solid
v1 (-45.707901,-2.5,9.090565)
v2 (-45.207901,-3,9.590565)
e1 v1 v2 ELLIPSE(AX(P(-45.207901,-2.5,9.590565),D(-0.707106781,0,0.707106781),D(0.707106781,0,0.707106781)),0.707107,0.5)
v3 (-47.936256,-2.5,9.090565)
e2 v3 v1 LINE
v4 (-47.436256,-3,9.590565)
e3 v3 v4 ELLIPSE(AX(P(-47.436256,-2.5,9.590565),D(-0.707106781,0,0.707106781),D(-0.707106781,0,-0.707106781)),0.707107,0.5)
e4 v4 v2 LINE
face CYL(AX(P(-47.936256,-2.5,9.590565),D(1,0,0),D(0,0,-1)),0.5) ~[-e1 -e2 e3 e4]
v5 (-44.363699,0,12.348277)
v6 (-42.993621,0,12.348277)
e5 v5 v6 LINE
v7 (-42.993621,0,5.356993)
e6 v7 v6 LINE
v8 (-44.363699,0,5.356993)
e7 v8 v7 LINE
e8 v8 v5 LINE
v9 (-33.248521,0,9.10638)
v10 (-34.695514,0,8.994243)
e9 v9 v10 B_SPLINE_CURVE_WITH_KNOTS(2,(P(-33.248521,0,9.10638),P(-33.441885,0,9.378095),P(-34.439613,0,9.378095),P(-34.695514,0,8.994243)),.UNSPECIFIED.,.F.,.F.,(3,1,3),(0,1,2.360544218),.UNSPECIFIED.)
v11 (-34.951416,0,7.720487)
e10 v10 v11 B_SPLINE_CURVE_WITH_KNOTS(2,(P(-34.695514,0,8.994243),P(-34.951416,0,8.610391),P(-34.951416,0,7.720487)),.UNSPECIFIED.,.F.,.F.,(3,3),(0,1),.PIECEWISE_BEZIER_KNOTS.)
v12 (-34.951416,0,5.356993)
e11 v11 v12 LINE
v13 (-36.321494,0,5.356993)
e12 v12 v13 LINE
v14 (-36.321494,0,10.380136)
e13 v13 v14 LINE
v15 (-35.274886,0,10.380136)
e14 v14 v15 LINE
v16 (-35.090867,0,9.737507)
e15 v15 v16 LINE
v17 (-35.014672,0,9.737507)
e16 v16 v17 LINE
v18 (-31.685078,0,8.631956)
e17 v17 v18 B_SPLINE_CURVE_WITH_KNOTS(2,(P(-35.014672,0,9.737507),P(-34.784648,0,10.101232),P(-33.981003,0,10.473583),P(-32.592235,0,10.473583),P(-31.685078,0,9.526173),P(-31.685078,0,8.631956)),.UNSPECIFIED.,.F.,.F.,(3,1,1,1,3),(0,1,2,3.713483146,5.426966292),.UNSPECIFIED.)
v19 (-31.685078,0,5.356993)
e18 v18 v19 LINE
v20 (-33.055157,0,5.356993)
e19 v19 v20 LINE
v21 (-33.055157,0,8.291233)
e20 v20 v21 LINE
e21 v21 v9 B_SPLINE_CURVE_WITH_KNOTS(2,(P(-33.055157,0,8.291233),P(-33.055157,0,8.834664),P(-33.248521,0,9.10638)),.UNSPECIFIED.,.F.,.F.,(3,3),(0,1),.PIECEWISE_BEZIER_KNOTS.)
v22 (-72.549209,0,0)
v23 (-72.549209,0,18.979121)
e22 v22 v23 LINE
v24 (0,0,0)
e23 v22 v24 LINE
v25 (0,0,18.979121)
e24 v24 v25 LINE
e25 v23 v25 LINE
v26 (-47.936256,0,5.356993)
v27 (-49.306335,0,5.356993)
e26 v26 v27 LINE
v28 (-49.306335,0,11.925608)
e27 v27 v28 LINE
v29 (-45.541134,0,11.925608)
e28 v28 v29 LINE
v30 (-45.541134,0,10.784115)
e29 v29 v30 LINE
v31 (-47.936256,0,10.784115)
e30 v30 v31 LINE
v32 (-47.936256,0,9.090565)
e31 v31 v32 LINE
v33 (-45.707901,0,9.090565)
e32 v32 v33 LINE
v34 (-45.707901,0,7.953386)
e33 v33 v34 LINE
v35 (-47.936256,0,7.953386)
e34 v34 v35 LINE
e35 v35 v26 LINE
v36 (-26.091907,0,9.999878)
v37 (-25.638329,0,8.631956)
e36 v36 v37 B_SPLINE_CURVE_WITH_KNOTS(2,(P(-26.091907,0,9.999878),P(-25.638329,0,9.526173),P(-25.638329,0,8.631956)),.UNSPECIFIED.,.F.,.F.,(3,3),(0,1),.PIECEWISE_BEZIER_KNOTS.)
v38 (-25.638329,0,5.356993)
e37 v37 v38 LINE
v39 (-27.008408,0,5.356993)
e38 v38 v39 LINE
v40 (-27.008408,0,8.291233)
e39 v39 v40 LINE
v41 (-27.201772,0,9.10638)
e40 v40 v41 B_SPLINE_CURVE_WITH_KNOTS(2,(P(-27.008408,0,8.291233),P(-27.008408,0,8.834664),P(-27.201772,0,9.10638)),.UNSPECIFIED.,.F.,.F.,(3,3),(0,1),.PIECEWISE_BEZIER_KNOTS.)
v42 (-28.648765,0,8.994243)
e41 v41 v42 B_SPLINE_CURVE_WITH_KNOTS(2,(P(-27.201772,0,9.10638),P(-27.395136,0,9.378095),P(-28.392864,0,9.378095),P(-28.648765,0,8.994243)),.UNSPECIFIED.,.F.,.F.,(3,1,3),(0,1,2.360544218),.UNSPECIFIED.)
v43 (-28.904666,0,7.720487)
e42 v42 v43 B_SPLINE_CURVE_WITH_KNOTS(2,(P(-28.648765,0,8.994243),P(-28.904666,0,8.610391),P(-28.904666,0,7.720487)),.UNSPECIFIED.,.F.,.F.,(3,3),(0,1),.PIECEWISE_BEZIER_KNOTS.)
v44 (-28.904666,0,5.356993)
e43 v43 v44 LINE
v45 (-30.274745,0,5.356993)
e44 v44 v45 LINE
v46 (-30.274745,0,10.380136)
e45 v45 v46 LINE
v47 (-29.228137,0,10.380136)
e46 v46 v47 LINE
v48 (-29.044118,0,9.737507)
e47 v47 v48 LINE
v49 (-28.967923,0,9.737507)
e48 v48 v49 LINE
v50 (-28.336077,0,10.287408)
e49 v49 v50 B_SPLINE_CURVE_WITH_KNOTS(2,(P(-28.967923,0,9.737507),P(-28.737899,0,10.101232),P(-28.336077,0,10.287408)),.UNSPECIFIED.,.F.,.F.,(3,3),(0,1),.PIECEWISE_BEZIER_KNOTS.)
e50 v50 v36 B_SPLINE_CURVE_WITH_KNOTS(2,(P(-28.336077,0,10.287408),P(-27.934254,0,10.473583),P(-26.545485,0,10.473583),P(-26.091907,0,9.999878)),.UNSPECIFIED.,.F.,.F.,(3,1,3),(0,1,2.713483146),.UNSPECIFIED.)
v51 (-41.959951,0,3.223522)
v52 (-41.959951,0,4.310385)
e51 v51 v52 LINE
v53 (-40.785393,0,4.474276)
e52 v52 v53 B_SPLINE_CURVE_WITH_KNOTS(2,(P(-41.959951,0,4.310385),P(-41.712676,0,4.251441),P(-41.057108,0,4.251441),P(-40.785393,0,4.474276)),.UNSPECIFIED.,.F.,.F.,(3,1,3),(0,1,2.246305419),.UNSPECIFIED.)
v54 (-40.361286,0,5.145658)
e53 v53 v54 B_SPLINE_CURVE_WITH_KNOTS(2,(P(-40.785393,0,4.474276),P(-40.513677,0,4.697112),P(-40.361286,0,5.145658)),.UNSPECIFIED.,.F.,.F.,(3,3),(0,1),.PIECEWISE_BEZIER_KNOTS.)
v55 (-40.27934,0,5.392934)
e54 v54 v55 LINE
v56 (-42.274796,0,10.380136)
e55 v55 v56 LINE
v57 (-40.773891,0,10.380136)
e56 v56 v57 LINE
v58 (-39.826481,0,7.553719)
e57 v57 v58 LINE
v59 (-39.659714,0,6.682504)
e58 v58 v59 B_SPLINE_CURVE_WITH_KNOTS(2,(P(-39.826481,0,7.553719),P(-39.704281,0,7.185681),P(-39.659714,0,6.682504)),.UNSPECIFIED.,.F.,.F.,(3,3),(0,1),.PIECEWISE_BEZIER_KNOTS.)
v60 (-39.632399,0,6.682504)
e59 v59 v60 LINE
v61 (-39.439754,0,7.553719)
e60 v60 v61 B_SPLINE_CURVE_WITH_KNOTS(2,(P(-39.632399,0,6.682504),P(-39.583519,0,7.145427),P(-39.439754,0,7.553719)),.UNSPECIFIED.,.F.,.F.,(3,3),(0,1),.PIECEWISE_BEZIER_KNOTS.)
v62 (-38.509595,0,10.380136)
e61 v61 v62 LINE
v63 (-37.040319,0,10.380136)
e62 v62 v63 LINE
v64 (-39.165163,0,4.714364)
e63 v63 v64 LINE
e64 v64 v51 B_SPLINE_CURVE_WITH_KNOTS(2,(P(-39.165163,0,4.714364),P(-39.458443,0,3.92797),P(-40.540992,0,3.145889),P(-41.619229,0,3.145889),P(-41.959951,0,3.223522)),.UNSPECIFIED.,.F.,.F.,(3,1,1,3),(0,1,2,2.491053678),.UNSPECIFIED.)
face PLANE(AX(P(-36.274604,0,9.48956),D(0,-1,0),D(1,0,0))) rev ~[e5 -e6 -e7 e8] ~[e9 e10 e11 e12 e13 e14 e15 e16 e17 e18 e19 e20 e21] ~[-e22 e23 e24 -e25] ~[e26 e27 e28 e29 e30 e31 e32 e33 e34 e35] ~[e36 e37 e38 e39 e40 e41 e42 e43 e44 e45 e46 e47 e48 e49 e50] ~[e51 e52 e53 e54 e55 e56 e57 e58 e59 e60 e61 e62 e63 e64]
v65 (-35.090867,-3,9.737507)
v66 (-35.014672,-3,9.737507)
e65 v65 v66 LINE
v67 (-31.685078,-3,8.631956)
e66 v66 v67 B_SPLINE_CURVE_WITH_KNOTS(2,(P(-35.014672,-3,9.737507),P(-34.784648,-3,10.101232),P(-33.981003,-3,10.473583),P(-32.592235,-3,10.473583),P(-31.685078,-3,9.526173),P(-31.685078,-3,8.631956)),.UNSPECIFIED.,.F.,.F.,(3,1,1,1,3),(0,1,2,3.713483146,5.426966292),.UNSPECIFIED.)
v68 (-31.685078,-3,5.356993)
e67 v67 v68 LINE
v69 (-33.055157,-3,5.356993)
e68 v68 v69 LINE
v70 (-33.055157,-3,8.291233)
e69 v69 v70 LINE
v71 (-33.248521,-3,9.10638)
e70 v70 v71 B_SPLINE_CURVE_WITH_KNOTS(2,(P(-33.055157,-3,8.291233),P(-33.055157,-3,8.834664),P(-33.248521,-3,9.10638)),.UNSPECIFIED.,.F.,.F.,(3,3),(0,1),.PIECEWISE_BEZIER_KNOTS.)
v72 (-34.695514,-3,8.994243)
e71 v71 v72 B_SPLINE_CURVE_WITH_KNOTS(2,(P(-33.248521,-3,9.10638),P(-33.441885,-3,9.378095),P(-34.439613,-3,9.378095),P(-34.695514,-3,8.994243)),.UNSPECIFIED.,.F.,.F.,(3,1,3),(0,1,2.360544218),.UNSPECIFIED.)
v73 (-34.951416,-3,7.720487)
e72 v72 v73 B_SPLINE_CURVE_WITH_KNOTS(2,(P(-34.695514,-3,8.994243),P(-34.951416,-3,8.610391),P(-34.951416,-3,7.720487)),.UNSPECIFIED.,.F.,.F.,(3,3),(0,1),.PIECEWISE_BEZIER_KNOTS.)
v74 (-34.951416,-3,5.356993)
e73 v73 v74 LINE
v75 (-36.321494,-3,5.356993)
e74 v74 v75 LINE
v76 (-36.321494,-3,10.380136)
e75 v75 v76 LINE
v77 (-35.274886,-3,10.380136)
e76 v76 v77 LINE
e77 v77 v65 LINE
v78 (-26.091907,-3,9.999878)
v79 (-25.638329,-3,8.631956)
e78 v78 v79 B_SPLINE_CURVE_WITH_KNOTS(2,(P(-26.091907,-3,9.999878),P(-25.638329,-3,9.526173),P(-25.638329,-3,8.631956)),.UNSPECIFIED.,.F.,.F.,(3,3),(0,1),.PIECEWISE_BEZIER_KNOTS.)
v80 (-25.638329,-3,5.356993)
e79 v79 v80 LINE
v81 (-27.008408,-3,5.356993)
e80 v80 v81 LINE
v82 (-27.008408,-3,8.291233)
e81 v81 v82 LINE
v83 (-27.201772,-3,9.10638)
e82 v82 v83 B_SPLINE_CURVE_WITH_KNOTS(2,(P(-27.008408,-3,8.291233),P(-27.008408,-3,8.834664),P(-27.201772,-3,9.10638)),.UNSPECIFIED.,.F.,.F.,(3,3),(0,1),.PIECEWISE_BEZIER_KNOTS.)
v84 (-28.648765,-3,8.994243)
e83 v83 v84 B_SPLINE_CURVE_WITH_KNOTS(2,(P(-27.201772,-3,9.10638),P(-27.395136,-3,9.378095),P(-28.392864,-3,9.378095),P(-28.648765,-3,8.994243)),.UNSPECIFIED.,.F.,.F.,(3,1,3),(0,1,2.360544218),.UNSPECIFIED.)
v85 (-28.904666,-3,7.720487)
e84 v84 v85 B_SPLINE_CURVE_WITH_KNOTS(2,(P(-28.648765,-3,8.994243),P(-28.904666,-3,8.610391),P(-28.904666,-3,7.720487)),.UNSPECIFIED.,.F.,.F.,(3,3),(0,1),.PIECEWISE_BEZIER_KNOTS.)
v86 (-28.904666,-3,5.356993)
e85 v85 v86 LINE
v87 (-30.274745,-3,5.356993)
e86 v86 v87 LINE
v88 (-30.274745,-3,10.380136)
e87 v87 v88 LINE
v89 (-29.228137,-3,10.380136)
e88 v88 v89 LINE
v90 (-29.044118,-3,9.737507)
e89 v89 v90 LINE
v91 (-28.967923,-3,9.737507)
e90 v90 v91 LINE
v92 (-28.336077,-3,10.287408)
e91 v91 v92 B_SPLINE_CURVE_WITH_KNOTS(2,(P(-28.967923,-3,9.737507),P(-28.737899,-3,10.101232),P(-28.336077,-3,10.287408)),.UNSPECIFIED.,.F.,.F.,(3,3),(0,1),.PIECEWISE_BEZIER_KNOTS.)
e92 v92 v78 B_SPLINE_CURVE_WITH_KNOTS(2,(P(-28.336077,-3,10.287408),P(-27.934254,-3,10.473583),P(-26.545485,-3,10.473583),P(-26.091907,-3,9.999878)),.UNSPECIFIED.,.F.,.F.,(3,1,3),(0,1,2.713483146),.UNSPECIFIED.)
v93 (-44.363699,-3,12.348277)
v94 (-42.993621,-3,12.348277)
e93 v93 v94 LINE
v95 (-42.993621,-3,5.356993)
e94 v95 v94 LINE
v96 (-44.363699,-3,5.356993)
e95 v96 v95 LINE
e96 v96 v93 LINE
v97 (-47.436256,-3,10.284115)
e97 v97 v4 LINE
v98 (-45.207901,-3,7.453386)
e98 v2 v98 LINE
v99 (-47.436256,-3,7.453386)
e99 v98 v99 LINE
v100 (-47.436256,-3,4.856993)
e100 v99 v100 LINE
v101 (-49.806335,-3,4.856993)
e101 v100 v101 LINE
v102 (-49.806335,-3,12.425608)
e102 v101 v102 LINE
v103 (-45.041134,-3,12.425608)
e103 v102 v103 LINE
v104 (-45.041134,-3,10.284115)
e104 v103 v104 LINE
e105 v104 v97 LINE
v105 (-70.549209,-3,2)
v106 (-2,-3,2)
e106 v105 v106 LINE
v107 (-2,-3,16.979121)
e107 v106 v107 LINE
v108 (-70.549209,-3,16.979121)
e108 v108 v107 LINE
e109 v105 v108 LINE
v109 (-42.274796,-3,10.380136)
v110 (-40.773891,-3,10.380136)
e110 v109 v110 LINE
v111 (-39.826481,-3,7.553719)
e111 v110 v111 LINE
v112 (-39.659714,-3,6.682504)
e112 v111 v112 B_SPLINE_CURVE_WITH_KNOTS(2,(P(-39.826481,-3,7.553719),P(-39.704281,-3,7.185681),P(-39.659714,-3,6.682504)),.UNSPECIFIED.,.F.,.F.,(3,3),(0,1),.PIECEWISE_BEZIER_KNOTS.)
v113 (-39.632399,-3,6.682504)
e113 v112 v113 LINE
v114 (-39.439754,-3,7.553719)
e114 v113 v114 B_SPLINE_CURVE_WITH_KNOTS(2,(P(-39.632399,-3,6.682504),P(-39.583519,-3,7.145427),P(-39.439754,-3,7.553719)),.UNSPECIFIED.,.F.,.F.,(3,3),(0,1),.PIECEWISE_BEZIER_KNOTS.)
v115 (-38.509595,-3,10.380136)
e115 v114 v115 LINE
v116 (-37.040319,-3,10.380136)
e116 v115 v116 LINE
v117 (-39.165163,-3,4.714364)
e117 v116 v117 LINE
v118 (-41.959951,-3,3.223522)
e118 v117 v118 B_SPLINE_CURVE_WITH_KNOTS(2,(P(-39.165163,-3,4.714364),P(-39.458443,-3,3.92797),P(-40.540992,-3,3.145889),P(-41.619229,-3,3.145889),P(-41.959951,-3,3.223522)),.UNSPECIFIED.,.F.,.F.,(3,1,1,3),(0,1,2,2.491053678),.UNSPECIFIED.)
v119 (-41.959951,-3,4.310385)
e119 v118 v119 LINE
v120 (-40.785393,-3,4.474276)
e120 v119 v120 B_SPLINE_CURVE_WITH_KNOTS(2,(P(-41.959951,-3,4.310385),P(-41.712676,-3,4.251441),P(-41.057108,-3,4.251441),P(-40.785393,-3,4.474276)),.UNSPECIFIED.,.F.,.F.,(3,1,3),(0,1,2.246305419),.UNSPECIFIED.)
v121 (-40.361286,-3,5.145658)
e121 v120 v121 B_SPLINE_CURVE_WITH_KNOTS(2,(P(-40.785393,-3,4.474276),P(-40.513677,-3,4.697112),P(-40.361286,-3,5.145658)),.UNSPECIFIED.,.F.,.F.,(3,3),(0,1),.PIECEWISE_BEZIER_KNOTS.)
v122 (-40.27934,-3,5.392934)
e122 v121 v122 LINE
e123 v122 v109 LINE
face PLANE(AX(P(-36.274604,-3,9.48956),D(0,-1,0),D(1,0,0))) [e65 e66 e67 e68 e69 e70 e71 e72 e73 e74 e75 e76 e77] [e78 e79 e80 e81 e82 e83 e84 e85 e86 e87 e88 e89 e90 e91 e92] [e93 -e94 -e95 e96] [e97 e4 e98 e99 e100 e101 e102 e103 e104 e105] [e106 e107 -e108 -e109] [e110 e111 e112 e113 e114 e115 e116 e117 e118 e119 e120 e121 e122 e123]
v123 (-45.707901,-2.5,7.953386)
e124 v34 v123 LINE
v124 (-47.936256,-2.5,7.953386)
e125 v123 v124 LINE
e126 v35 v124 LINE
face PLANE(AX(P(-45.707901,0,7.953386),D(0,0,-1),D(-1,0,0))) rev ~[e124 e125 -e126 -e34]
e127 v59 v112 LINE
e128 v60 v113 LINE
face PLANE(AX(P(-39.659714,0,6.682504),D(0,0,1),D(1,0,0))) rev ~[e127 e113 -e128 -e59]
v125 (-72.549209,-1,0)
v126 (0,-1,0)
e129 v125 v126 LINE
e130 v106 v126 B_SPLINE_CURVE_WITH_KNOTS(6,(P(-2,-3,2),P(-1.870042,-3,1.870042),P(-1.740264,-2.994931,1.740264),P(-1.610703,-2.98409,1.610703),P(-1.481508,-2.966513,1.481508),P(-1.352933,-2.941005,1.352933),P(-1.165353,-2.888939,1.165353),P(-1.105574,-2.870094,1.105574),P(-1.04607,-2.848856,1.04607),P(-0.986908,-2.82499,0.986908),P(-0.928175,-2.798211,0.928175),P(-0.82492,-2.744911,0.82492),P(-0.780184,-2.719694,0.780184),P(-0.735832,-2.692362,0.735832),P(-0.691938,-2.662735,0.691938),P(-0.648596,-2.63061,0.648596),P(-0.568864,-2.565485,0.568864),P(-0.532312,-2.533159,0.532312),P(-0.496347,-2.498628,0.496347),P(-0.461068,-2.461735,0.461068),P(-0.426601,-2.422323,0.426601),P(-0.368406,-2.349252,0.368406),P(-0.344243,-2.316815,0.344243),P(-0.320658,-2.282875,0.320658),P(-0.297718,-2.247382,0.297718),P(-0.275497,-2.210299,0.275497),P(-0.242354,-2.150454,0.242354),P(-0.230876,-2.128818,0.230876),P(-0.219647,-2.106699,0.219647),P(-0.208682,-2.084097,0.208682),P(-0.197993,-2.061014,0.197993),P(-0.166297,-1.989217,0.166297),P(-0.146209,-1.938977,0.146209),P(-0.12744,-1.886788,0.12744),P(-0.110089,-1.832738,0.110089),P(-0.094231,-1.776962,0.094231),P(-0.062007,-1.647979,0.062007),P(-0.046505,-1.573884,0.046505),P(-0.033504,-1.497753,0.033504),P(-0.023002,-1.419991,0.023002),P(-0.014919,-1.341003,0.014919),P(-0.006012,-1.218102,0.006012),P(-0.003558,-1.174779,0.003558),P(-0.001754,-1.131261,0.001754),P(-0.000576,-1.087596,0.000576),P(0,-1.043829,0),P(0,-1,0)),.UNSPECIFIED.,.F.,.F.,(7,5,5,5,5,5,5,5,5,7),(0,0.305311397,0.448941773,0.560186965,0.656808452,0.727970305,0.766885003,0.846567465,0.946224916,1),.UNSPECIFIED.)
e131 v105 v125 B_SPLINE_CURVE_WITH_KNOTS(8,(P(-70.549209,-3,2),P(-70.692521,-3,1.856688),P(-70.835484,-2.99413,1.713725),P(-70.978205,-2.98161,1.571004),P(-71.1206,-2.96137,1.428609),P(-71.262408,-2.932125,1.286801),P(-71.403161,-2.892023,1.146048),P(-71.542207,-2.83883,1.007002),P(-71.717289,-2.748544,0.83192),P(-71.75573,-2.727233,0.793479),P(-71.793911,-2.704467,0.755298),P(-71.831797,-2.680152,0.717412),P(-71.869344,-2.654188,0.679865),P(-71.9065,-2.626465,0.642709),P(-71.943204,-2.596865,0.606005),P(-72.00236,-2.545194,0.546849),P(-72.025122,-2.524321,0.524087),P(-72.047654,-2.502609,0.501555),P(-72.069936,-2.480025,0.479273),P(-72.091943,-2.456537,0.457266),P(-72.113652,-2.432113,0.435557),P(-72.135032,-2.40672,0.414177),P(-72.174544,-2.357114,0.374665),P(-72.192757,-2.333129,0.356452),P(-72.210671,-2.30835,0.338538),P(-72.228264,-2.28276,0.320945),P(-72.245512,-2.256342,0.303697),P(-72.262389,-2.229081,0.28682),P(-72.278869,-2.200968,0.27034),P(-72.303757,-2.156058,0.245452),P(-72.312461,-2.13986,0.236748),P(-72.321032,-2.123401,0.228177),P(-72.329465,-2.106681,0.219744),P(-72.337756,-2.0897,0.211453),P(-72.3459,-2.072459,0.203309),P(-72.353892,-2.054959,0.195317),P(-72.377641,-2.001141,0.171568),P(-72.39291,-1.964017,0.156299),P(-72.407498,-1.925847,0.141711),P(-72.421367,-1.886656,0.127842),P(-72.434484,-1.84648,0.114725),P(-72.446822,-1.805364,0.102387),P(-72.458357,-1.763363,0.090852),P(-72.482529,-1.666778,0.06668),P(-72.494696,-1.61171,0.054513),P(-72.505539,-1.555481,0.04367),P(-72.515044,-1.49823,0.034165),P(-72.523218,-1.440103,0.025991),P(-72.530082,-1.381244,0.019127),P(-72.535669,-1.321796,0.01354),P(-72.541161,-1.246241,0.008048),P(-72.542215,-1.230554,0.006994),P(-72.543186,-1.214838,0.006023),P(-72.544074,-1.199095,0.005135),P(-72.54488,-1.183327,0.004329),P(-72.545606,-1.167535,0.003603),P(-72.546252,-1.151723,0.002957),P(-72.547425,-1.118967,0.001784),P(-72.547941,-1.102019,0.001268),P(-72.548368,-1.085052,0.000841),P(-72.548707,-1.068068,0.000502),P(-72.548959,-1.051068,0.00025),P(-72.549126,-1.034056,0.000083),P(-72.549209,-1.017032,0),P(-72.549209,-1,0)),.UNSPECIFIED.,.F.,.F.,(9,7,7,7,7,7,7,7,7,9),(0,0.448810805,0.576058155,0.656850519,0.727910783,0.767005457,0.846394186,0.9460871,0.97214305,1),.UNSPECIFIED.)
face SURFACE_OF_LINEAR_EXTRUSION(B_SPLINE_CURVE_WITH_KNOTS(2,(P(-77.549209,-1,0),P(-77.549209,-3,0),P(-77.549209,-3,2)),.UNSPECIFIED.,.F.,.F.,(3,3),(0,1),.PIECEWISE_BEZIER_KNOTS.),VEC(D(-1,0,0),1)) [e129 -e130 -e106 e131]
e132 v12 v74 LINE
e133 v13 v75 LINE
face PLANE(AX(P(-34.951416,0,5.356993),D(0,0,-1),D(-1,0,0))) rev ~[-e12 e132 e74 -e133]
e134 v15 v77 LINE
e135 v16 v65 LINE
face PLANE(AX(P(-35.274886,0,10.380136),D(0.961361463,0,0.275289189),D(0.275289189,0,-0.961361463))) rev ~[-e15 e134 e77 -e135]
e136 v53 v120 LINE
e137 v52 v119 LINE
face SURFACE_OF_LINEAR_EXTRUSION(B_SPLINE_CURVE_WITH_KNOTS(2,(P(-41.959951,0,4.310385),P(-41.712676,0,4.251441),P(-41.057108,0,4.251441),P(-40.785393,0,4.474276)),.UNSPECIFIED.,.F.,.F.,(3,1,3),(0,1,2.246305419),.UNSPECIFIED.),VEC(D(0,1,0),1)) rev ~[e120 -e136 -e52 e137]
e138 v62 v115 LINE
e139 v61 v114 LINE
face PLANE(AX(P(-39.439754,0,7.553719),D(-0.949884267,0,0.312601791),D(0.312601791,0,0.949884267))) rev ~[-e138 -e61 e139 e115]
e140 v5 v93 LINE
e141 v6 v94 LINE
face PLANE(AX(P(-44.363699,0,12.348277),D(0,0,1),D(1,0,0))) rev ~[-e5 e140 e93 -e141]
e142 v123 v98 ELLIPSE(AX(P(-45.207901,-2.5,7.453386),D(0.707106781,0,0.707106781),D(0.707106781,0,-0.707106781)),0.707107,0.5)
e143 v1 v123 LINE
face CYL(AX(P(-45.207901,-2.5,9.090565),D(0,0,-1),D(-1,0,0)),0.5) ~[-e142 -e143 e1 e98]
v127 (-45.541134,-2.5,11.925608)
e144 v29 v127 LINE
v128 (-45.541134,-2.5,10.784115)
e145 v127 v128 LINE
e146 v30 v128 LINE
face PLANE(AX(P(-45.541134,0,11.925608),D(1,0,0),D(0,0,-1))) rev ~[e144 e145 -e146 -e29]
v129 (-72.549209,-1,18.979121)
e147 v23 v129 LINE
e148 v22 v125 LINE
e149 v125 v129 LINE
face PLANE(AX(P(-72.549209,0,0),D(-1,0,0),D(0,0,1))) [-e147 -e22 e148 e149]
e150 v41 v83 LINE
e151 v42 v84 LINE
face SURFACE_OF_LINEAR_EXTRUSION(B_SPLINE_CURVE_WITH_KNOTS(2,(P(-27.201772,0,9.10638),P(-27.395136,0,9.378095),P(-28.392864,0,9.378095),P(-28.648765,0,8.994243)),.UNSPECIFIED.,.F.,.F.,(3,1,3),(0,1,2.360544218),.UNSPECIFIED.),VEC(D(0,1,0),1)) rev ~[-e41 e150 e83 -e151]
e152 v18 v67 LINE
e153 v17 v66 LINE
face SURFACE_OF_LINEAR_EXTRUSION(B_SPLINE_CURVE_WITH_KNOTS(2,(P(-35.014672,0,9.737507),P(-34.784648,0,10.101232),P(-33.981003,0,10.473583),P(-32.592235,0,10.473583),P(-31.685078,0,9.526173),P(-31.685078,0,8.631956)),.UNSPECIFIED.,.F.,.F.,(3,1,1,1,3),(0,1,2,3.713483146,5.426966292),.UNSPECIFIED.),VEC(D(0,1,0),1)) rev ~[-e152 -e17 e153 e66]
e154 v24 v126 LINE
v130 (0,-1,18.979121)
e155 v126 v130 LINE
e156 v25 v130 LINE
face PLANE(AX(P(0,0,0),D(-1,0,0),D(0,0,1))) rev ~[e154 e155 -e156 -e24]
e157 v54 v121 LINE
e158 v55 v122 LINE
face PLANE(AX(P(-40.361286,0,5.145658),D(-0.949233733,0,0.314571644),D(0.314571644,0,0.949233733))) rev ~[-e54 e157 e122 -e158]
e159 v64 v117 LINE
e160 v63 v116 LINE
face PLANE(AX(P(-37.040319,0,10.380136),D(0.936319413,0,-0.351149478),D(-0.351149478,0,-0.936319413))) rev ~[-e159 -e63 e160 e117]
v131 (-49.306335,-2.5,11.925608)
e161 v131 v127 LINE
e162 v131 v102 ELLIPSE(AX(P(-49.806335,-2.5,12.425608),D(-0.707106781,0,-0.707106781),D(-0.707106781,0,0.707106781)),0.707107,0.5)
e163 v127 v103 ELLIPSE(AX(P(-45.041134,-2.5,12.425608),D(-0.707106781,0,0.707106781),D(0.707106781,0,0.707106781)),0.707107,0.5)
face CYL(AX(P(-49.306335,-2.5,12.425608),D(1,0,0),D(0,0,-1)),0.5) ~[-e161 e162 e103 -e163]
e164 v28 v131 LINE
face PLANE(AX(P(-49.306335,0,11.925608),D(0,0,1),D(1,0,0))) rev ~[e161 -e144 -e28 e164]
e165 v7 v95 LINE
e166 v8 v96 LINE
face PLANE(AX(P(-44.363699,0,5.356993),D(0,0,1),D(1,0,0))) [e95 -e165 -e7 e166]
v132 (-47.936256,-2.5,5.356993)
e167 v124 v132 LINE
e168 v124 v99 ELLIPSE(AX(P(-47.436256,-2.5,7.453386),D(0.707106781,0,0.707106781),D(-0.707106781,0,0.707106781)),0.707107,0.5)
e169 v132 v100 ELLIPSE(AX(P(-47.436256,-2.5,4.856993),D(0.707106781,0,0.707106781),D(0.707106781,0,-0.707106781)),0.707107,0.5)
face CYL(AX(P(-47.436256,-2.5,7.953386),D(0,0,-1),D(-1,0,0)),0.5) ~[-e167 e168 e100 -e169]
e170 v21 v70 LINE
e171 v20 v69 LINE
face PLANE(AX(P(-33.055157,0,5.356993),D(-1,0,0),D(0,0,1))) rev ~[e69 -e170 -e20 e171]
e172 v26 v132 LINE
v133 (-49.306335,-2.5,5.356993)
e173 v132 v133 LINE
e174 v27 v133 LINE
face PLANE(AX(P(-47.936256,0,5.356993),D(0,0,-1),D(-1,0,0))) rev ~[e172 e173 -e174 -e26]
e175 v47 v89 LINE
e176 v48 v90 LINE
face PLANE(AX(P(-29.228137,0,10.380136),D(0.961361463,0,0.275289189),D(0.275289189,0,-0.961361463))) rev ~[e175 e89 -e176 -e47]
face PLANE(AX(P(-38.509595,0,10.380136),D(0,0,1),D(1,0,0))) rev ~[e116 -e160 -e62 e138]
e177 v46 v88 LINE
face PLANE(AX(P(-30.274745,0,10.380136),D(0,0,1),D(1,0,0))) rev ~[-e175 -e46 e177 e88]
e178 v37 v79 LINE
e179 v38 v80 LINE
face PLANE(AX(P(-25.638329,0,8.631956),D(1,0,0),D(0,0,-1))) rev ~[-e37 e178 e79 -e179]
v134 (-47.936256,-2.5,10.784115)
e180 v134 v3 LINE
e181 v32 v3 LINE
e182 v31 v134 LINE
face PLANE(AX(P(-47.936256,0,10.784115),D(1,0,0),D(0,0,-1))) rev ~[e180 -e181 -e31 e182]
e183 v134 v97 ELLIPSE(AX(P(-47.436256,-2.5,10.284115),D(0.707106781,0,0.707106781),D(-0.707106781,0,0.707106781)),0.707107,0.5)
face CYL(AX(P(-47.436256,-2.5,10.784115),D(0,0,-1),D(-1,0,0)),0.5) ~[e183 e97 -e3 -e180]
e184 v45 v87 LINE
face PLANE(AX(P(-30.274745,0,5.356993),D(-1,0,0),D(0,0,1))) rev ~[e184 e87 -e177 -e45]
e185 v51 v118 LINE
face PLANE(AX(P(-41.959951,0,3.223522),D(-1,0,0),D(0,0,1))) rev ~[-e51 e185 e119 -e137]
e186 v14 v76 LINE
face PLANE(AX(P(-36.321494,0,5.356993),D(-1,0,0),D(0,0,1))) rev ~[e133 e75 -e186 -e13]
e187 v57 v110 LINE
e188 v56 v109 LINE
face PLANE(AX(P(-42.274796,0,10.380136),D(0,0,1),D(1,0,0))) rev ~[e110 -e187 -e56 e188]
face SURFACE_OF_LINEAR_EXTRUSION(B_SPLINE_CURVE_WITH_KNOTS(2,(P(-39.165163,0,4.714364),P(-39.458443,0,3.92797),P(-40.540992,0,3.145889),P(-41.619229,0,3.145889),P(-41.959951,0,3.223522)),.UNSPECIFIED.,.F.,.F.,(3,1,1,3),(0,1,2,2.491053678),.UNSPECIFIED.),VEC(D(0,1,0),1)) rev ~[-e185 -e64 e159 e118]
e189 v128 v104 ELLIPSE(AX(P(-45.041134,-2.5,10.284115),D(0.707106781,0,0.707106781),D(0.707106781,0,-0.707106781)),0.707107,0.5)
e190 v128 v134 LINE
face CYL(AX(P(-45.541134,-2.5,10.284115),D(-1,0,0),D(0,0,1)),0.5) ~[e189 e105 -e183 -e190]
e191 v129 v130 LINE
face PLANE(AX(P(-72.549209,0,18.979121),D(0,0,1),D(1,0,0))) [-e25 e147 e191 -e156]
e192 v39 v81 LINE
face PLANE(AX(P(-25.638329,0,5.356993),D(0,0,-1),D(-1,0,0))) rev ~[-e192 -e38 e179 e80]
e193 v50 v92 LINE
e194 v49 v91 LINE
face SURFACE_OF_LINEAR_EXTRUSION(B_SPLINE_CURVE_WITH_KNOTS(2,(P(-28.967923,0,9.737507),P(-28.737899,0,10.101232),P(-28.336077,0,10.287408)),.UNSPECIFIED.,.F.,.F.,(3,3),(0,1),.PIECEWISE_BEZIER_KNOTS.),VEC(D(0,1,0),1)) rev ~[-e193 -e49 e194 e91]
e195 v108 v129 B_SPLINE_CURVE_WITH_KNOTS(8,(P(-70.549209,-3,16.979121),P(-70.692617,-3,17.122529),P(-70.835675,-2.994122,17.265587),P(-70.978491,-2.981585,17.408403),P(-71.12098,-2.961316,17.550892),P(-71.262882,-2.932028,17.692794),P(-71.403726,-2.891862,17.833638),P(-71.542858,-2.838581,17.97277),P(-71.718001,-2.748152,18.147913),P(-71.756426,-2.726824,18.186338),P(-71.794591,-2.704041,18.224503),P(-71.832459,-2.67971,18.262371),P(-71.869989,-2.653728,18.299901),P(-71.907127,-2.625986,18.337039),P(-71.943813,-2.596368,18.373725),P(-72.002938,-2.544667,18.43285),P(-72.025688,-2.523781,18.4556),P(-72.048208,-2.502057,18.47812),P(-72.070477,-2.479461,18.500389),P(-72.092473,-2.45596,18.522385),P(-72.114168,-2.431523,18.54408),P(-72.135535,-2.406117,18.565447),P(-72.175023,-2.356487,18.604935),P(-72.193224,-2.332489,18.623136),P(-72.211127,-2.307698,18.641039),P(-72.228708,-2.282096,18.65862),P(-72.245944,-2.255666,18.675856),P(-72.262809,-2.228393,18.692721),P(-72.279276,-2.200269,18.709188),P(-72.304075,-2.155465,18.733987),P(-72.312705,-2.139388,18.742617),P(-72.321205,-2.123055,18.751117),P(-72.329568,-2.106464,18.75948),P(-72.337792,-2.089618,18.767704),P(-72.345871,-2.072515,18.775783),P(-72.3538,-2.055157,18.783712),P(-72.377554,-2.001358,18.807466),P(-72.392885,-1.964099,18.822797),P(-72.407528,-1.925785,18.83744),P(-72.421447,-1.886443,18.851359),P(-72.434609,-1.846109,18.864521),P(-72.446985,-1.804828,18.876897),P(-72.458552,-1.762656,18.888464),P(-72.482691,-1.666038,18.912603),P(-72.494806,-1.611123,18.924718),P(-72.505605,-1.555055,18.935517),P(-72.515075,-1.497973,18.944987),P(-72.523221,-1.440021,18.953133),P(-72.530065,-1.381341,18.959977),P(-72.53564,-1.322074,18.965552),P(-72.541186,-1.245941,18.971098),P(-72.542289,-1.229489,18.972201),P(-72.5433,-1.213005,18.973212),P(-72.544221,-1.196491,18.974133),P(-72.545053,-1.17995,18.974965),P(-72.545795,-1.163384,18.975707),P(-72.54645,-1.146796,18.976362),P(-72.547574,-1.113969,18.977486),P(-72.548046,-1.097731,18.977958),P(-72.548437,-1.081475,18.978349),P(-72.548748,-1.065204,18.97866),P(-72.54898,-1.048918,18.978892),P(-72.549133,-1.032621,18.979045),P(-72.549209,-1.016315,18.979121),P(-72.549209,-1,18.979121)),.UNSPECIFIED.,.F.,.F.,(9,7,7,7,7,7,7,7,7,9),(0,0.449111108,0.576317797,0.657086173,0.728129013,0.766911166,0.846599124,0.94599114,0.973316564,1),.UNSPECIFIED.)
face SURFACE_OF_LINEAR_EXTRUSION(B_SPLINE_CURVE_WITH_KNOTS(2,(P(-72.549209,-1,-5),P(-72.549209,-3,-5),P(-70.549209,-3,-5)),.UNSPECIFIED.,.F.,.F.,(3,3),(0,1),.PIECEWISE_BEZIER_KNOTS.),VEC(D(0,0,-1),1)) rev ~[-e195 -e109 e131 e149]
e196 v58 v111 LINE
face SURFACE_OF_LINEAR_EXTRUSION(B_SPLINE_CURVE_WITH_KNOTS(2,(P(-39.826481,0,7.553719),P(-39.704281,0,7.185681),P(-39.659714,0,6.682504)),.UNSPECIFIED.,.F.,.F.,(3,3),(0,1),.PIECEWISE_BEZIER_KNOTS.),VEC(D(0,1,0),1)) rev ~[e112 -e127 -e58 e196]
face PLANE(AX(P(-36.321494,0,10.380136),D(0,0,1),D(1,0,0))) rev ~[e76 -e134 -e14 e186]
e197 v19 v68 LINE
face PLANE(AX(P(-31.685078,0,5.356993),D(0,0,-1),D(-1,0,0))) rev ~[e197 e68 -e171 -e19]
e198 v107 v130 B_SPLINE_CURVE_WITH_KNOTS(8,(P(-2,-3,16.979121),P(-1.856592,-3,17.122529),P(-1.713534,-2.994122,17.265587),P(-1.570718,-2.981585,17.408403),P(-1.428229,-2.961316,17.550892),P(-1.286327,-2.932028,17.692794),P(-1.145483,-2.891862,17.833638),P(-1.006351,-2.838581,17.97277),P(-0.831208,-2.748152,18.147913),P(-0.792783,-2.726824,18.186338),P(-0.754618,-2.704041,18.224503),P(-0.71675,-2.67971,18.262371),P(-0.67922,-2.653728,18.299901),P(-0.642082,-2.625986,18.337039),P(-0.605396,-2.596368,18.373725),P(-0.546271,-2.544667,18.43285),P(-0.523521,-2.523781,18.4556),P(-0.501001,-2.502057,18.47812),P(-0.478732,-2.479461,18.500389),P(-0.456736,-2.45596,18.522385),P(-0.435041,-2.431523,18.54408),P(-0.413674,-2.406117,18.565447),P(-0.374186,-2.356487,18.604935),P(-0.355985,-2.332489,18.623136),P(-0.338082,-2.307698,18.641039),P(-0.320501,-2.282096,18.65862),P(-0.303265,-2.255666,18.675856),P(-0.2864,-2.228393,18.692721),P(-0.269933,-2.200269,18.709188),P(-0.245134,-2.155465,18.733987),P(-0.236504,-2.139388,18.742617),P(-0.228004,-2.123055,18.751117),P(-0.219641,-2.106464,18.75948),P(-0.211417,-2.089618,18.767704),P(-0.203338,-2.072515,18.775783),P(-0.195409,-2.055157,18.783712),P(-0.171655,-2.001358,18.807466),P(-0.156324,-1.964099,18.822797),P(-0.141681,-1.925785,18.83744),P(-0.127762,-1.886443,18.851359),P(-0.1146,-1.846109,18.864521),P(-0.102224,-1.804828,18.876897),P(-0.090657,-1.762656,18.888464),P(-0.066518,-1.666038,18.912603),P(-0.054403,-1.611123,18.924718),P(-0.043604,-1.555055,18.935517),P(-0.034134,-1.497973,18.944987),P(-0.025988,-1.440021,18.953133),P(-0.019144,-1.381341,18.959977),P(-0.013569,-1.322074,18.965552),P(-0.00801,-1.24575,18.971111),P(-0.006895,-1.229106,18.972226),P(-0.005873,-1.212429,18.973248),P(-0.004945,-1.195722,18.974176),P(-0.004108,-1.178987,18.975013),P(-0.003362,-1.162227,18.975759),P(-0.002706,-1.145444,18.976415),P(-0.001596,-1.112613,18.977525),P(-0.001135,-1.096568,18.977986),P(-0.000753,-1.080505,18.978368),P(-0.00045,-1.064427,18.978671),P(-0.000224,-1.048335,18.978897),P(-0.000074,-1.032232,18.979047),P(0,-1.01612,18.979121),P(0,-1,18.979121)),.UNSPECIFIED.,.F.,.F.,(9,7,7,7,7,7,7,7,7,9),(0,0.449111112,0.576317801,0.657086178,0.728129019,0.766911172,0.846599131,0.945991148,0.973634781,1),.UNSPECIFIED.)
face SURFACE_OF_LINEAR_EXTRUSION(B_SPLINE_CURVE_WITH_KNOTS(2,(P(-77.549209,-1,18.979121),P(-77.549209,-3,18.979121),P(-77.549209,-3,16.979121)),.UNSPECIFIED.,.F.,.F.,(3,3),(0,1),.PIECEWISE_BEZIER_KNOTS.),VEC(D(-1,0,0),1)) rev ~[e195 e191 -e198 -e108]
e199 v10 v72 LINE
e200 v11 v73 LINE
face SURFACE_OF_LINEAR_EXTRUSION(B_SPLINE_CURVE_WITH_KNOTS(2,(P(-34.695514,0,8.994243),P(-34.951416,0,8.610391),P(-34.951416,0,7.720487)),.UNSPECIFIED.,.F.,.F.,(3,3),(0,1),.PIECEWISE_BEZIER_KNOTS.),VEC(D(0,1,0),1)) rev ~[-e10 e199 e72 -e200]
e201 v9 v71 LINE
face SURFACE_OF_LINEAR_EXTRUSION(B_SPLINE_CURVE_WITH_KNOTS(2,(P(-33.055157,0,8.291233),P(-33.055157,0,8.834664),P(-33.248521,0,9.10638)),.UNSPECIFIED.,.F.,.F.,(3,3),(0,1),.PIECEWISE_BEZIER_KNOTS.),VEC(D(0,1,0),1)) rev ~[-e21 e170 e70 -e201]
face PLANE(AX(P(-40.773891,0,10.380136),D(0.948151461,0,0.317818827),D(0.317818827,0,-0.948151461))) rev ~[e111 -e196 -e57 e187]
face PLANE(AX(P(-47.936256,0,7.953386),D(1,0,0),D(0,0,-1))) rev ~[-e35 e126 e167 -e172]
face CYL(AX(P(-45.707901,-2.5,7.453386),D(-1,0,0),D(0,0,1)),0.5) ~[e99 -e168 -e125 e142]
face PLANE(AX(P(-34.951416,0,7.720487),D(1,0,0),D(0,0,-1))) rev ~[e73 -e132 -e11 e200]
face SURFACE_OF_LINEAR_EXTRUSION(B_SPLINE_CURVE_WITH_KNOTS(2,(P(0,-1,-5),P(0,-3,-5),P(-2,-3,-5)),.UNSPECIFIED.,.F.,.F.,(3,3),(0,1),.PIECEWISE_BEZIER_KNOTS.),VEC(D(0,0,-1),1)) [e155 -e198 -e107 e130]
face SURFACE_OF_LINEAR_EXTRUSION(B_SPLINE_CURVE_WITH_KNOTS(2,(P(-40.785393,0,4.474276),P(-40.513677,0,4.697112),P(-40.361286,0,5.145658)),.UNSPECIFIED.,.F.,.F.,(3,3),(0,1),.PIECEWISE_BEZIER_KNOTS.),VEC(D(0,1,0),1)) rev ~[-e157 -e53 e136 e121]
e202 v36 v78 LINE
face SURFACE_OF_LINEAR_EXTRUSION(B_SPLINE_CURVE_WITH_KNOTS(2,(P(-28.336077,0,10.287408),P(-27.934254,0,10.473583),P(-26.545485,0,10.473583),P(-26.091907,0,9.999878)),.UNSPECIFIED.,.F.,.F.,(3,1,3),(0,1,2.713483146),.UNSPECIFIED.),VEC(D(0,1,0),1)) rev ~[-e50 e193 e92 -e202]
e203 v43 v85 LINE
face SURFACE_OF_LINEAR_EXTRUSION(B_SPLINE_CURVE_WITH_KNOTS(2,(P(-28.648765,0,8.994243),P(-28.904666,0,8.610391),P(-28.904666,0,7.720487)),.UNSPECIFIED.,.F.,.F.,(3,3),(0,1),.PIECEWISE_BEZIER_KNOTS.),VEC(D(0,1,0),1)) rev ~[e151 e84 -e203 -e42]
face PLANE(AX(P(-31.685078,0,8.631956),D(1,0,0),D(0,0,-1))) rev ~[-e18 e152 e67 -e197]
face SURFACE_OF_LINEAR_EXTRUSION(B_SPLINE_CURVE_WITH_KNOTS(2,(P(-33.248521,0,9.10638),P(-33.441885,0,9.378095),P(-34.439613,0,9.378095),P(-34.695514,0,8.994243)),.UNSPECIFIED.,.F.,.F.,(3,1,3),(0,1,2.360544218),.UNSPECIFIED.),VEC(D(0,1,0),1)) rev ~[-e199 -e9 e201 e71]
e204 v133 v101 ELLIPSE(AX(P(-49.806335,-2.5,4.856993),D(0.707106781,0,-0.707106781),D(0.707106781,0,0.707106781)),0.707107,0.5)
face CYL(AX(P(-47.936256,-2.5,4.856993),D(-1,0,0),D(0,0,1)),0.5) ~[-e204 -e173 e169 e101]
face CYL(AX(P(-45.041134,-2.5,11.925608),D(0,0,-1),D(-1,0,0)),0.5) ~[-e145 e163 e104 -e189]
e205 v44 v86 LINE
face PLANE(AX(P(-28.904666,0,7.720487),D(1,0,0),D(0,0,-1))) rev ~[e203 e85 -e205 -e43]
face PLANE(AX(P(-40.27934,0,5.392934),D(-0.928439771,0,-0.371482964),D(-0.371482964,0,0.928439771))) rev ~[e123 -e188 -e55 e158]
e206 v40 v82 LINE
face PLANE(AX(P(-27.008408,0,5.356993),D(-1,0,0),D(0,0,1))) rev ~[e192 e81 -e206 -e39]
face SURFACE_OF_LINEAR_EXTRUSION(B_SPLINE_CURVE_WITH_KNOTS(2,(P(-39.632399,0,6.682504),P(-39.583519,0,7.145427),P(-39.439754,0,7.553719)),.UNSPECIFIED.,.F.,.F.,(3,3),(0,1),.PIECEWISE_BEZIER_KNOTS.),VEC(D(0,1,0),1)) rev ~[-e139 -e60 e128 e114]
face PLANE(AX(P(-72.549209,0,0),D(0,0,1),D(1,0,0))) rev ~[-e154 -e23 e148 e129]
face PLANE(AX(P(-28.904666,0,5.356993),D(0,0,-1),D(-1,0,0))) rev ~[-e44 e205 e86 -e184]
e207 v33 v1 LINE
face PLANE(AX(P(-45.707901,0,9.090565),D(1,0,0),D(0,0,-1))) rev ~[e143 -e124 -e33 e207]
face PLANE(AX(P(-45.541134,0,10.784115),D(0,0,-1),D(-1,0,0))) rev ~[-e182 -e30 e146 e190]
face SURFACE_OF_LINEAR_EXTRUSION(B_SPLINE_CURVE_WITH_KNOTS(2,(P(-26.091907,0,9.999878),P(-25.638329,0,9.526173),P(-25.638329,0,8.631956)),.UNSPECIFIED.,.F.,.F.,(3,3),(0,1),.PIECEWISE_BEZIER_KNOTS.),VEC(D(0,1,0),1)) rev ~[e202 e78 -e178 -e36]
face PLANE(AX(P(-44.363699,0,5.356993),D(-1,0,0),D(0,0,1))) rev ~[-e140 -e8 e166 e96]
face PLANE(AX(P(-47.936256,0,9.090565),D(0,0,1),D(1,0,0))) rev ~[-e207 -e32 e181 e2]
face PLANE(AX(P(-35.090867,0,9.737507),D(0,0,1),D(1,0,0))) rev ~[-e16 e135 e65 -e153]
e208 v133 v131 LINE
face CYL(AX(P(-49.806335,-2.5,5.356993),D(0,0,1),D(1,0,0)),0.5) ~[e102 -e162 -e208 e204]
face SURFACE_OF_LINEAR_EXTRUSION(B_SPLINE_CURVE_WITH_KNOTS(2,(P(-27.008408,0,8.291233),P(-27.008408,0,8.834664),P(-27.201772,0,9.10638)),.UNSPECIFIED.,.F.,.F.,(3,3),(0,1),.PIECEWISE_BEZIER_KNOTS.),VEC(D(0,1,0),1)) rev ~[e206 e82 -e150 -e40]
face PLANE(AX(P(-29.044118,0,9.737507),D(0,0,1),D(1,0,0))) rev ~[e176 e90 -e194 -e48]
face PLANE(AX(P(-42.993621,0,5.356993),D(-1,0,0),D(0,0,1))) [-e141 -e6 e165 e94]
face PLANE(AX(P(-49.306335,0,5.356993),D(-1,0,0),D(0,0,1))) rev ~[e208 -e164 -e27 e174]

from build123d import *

# Parameters (mm, degrees)
F0_W        = 72.5492089987
F0_H        = 18.9791209996
F0_W_2      = 1.3700789067
F0_H_2      = 6.9912840748
F1_DEPTH    = 3
F2_T1_DEPTH = 82.5492089987
F2_T3_DEPTH = 28.9791209996
F3_R        = 0.5


# Not quite as in the source:
# - a fillet or chamfer that OpenCascade refuses, or shapes differently, is made with other operations: its cross-section is extruded or revolved along the edge and cut away or added


with BuildPart() as f1:
    # F0 (on Front) → F1 (new body)
    with BuildSketch(Plane.XZ):
        with Locations((-36.2746044993, 9.4895604998)):
            Rectangle(F0_W, F0_H)
        with BuildLine():
            Line((-40.2793404323, 5.3929338044), (-42.2747963845, 10.3801360367))
            Line((-42.2747963845, 10.3801360367), (-40.7738914752, 10.3801360367))
            Line((-40.7738914752, 10.3801360367), (-39.8264811924, 7.5537193204))
            add(Edge.make_bspline(
                [(-39.8264811924, 7.5537193204), (-39.70428108, 7.185681335), (-39.6597139803, 6.6825044018)],
                knots=[0, 0, 0, 1, 1, 1], degree=2))
            Line((-39.6597139803, 6.6825044018), (-39.632398661, 6.6825044018))
            add(Edge.make_bspline(
                [(-39.632398661, 6.6825044018), (-39.5835186161, 7.1454271804), (-39.439753778, 7.5537193204)],
                knots=[0, 0, 0, 1, 1, 1], degree=2))
            Line((-39.439753778, 7.5537193204), (-38.5095952758, 10.3801360367))
            Line((-38.5095952758, 10.3801360367), (-37.0403186308, 10.3801360367))
            Line((-37.0403186308, 10.3801360367), (-39.1651629373, 4.7143637688))
            add(Edge.make_bspline(
                [(-39.1651629373, 4.7143637688), (-39.458443207, 3.9279701046), (-39.9997178223, 3.5369297451)],
                knots=[0, 0, 0, 1, 1, 1], degree=2))
            add(Edge.make_bspline(
                [(-39.9997178223, 3.5369297451), (-40.5409924376, 3.1458893856), (-41.264129573, 3.1458893856)],
                knots=[0, 0, 0, 1, 1, 1], degree=2))
            add(Edge.make_bspline(
                [(-41.264129573, 3.1458893856), (-41.619228723, 3.1458893856), (-41.9599513892, 3.2235223981)],
                knots=[0, 0, 0, 1, 1, 1], degree=2))
            Line((-41.9599513892, 3.2235223981), (-41.9599513892, 4.3103845738))
            add(Edge.make_bspline(
                [(-41.9599513892, 4.3103845738), (-41.7126758677, 4.2514409902), (-41.4208332465, 4.2514409902)],
                knots=[0, 0, 0, 1, 1, 1], degree=2))
            add(Edge.make_bspline(
                [(-41.4208332465, 4.2514409902), (-41.0571082062, 4.2514409902), (-40.7853926623, 4.4742764892)],
                knots=[0, 0, 0, 1, 1, 1], degree=2))
            add(Edge.make_bspline(
                [(-40.7853926623, 4.4742764892), (-40.5136771183, 4.6971119882), (-40.36128639, 5.145658283)],
                knots=[0, 0, 0, 1, 1, 1], degree=2))
            Line((-40.36128639, 5.145658283), (-40.2793404323, 5.3929338044))
        make_face(mode=Mode.SUBTRACT)
        Polygon((-47.9362557073, 7.9533855702), (-47.9362557073, 5.3569925949), (-49.306334614, 5.3569925949), (-49.306334614, 11.9256080458), (-45.5411335052, 11.9256080458), (-45.5411335052, 10.7841152316), (-47.9362557073, 10.7841152316), (-47.9362557073, 9.0905654393), (-45.7079007174, 9.0905654393), (-45.7079007174, 7.9533855702), align=None, mode=Mode.SUBTRACT)
        with Locations((-43.6786600282, 8.8526346323)):
            Rectangle(F0_W_2, F0_H_2, mode=Mode.SUBTRACT)
        with BuildLine():
            Line((-31.6850784131, 8.6319556059), (-31.6850784131, 5.3569925949))
            Line((-31.6850784131, 5.3569925949), (-33.0551573198, 5.3569925949))
            Line((-33.0551573198, 5.3569925949), (-33.0551573198, 8.2912329397))
            add(Edge.make_bspline(
                [(-33.0551573198, 8.2912329397), (-33.0551573198, 8.8346640275), (-33.248521027, 9.1063795715)],
                knots=[0, 0, 0, 1, 1, 1], degree=2))
            add(Edge.make_bspline(
                [(-33.248521027, 9.1063795715), (-33.4418847342, 9.3780951154), (-33.8645533581, 9.3780951154)],
                knots=[0, 0, 0, 1, 1, 1], degree=2))
            add(Edge.make_bspline(
                [(-33.8645533581, 9.3780951154), (-34.4396127103, 9.3780951154), (-34.6955141221, 8.9942429978)],
                knots=[0, 0, 0, 1, 1, 1], degree=2))
            add(Edge.make_bspline(
                [(-34.6955141221, 8.9942429978), (-34.9514155338, 8.6103908802), (-34.9514155338, 7.7204865326)],
                knots=[0, 0, 0, 1, 1, 1], degree=2))
            Line((-34.9514155338, 7.7204865326), (-34.9514155338, 5.3569925949))
            Line((-34.9514155338, 5.3569925949), (-36.3214944405, 5.3569925949))
            Line((-36.3214944405, 5.3569925949), (-36.3214944405, 10.3801360367))
            Line((-36.3214944405, 10.3801360367), (-35.2748864195, 10.3801360367))
            Line((-35.2748864195, 10.3801360367), (-35.0908674267, 9.7375072106))
            Line((-35.0908674267, 9.7375072106), (-35.0146720626, 9.7375072106))
            add(Edge.make_bspline(
                [(-35.0146720626, 9.7375072106), (-34.7846483217, 10.1012322508), (-34.3828255993, 10.2874077161)],
                knots=[0, 0, 0, 1, 1, 1], degree=2))
            add(Edge.make_bspline(
                [(-34.3828255993, 10.2874077161), (-33.9810028769, 10.4735831814), (-33.4692000534, 10.4735831814)],
                knots=[0, 0, 0, 1, 1, 1], degree=2))
            add(Edge.make_bspline(
                [(-33.4692000534, 10.4735831814), (-32.5922345413, 10.4735831814), (-32.1386564772, 9.99987804)],
                knots=[0, 0, 0, 1, 1, 1], degree=2))
            add(Edge.make_bspline(
                [(-32.1386564772, 9.99987804), (-31.6850784131, 9.5261728986), (-31.6850784131, 8.6319556059)],
                knots=[0, 0, 0, 1, 1, 1], degree=2))
        make_face(mode=Mode.SUBTRACT)
        with BuildLine():
            Line((-25.6383293244, 8.6319556059), (-25.6383293244, 5.3569925949))
            Line((-25.6383293244, 5.3569925949), (-27.0084082311, 5.3569925949))
            Line((-27.0084082311, 5.3569925949), (-27.0084082311, 8.2912329397))
            add(Edge.make_bspline(
                [(-27.0084082311, 8.2912329397), (-27.0084082311, 8.8346640275), (-27.2017719383, 9.1063795715)],
                knots=[0, 0, 0, 1, 1, 1], degree=2))
            add(Edge.make_bspline(
                [(-27.2017719383, 9.1063795715), (-27.3951356454, 9.3780951154), (-27.8178042693, 9.3780951154)],
                knots=[0, 0, 0, 1, 1, 1], degree=2))
            add(Edge.make_bspline(
                [(-27.8178042693, 9.3780951154), (-28.3928636216, 9.3780951154), (-28.6487650333, 8.9942429978)],
                knots=[0, 0, 0, 1, 1, 1], degree=2))
            add(Edge.make_bspline(
                [(-28.6487650333, 8.9942429978), (-28.9046664451, 8.6103908802), (-28.9046664451, 7.7204865326)],
                knots=[0, 0, 0, 1, 1, 1], degree=2))
            Line((-28.9046664451, 7.7204865326), (-28.9046664451, 5.3569925949))
            Line((-28.9046664451, 5.3569925949), (-30.2747453518, 5.3569925949))
            Line((-30.2747453518, 5.3569925949), (-30.2747453518, 10.3801360367))
            Line((-30.2747453518, 10.3801360367), (-29.2281373307, 10.3801360367))
            Line((-29.2281373307, 10.3801360367), (-29.044118338, 9.7375072106))
            Line((-29.044118338, 9.7375072106), (-28.9679229738, 9.7375072106))
            add(Edge.make_bspline(
                [(-28.9679229738, 9.7375072106), (-28.7378992329, 10.1012322508), (-28.3360765105, 10.2874077161)],
                knots=[0, 0, 0, 1, 1, 1], degree=2))
            add(Edge.make_bspline(
                [(-28.3360765105, 10.2874077161), (-27.9342537882, 10.4735831814), (-27.4224509647, 10.4735831814)],
                knots=[0, 0, 0, 1, 1, 1], degree=2))
            add(Edge.make_bspline(
                [(-27.4224509647, 10.4735831814), (-26.5454854525, 10.4735831814), (-26.0919073884, 9.99987804)],
                knots=[0, 0, 0, 1, 1, 1], degree=2))
            add(Edge.make_bspline(
                [(-26.0919073884, 9.99987804), (-25.6383293244, 9.5261728986), (-25.6383293244, 8.6319556059)],
                knots=[0, 0, 0, 1, 1, 1], degree=2))
        make_face(mode=Mode.SUBTRACT)
    extrude(amount=F1_DEPTH)

    # F2: fillet of radius 2 on 4 edges, made by hand

    # F2_s2 → F2_t1 (cut)
    with BuildSketch(Plane.YZ.offset(-77.5492089987)):
        with BuildLine():
            add(Edge.make_bspline(
                [(-1, 18.9791209996), (-3, 18.9791209996), (-3, 16.9791209996)],
                knots=[0, 0, 0, 1, 1, 1], degree=2, weights=[1, 1, 1]))
            Line((-3, 16.9791209996), (-3, 18.9791209996))
            Line((-3, 18.9791209996), (-1, 18.9791209996))
        make_face()
        with BuildLine():
            add(Edge.make_bspline(
                [(-1, 0), (-3, 0), (-3, 2)],
                knots=[0, 0, 0, 1, 1, 1], degree=2, weights=[1, 1, 1]))
            Line((-3, 2), (-3, 0))
            Line((-3, 0), (-1, 0))
        make_face()
    extrude(amount=F2_T1_DEPTH, mode=Mode.SUBTRACT)

    # F2_s4 → F2_t3 (cut)
    with BuildSketch(Plane.XY.offset(-5)):
        with BuildLine():
            add(Edge.make_bspline(
                [(-72.5492089987, -1), (-72.5492089987, -3), (-70.5492089987, -3)],
                knots=[0, 0, 0, 1, 1, 1], degree=2, weights=[1, 1, 1]))
            Line((-70.5492089987, -3), (-72.5492089987, -3))
            Line((-72.5492089987, -3), (-72.5492089987, -1))
        make_face()
        with BuildLine():
            add(Edge.make_bspline(
                [(0, -1), (0, -3), (-2, -3)],
                knots=[0, 0, 0, 1, 1, 1], degree=2, weights=[1, 1, 1]))
            Line((-2, -3), (0, -3))
            Line((0, -3), (0, -1))
        make_face()
    extrude(amount=F2_T3_DEPTH, mode=Mode.SUBTRACT)

    # F3
    f3_edges = [f1.edges().sort_by_distance(p)[0] for p in [
        (-49.306335, -3, 8.6413),
        (-47.423734, -3, 11.925608),
        (-45.541134, -3, 11.354862),
        (-46.738695, -3, 10.784115),
        (-47.936256, -3, 9.93734),
        (-46.822078, -3, 9.090565),
        (-45.707901, -3, 8.521976),
        (-46.822078, -3, 7.953386),
        (-47.936256, -3, 6.655189),
        (-48.621295, -3, 5.356993),
    ]]
    fillet(f3_edges, radius=F3_R)


solid = f1.part
